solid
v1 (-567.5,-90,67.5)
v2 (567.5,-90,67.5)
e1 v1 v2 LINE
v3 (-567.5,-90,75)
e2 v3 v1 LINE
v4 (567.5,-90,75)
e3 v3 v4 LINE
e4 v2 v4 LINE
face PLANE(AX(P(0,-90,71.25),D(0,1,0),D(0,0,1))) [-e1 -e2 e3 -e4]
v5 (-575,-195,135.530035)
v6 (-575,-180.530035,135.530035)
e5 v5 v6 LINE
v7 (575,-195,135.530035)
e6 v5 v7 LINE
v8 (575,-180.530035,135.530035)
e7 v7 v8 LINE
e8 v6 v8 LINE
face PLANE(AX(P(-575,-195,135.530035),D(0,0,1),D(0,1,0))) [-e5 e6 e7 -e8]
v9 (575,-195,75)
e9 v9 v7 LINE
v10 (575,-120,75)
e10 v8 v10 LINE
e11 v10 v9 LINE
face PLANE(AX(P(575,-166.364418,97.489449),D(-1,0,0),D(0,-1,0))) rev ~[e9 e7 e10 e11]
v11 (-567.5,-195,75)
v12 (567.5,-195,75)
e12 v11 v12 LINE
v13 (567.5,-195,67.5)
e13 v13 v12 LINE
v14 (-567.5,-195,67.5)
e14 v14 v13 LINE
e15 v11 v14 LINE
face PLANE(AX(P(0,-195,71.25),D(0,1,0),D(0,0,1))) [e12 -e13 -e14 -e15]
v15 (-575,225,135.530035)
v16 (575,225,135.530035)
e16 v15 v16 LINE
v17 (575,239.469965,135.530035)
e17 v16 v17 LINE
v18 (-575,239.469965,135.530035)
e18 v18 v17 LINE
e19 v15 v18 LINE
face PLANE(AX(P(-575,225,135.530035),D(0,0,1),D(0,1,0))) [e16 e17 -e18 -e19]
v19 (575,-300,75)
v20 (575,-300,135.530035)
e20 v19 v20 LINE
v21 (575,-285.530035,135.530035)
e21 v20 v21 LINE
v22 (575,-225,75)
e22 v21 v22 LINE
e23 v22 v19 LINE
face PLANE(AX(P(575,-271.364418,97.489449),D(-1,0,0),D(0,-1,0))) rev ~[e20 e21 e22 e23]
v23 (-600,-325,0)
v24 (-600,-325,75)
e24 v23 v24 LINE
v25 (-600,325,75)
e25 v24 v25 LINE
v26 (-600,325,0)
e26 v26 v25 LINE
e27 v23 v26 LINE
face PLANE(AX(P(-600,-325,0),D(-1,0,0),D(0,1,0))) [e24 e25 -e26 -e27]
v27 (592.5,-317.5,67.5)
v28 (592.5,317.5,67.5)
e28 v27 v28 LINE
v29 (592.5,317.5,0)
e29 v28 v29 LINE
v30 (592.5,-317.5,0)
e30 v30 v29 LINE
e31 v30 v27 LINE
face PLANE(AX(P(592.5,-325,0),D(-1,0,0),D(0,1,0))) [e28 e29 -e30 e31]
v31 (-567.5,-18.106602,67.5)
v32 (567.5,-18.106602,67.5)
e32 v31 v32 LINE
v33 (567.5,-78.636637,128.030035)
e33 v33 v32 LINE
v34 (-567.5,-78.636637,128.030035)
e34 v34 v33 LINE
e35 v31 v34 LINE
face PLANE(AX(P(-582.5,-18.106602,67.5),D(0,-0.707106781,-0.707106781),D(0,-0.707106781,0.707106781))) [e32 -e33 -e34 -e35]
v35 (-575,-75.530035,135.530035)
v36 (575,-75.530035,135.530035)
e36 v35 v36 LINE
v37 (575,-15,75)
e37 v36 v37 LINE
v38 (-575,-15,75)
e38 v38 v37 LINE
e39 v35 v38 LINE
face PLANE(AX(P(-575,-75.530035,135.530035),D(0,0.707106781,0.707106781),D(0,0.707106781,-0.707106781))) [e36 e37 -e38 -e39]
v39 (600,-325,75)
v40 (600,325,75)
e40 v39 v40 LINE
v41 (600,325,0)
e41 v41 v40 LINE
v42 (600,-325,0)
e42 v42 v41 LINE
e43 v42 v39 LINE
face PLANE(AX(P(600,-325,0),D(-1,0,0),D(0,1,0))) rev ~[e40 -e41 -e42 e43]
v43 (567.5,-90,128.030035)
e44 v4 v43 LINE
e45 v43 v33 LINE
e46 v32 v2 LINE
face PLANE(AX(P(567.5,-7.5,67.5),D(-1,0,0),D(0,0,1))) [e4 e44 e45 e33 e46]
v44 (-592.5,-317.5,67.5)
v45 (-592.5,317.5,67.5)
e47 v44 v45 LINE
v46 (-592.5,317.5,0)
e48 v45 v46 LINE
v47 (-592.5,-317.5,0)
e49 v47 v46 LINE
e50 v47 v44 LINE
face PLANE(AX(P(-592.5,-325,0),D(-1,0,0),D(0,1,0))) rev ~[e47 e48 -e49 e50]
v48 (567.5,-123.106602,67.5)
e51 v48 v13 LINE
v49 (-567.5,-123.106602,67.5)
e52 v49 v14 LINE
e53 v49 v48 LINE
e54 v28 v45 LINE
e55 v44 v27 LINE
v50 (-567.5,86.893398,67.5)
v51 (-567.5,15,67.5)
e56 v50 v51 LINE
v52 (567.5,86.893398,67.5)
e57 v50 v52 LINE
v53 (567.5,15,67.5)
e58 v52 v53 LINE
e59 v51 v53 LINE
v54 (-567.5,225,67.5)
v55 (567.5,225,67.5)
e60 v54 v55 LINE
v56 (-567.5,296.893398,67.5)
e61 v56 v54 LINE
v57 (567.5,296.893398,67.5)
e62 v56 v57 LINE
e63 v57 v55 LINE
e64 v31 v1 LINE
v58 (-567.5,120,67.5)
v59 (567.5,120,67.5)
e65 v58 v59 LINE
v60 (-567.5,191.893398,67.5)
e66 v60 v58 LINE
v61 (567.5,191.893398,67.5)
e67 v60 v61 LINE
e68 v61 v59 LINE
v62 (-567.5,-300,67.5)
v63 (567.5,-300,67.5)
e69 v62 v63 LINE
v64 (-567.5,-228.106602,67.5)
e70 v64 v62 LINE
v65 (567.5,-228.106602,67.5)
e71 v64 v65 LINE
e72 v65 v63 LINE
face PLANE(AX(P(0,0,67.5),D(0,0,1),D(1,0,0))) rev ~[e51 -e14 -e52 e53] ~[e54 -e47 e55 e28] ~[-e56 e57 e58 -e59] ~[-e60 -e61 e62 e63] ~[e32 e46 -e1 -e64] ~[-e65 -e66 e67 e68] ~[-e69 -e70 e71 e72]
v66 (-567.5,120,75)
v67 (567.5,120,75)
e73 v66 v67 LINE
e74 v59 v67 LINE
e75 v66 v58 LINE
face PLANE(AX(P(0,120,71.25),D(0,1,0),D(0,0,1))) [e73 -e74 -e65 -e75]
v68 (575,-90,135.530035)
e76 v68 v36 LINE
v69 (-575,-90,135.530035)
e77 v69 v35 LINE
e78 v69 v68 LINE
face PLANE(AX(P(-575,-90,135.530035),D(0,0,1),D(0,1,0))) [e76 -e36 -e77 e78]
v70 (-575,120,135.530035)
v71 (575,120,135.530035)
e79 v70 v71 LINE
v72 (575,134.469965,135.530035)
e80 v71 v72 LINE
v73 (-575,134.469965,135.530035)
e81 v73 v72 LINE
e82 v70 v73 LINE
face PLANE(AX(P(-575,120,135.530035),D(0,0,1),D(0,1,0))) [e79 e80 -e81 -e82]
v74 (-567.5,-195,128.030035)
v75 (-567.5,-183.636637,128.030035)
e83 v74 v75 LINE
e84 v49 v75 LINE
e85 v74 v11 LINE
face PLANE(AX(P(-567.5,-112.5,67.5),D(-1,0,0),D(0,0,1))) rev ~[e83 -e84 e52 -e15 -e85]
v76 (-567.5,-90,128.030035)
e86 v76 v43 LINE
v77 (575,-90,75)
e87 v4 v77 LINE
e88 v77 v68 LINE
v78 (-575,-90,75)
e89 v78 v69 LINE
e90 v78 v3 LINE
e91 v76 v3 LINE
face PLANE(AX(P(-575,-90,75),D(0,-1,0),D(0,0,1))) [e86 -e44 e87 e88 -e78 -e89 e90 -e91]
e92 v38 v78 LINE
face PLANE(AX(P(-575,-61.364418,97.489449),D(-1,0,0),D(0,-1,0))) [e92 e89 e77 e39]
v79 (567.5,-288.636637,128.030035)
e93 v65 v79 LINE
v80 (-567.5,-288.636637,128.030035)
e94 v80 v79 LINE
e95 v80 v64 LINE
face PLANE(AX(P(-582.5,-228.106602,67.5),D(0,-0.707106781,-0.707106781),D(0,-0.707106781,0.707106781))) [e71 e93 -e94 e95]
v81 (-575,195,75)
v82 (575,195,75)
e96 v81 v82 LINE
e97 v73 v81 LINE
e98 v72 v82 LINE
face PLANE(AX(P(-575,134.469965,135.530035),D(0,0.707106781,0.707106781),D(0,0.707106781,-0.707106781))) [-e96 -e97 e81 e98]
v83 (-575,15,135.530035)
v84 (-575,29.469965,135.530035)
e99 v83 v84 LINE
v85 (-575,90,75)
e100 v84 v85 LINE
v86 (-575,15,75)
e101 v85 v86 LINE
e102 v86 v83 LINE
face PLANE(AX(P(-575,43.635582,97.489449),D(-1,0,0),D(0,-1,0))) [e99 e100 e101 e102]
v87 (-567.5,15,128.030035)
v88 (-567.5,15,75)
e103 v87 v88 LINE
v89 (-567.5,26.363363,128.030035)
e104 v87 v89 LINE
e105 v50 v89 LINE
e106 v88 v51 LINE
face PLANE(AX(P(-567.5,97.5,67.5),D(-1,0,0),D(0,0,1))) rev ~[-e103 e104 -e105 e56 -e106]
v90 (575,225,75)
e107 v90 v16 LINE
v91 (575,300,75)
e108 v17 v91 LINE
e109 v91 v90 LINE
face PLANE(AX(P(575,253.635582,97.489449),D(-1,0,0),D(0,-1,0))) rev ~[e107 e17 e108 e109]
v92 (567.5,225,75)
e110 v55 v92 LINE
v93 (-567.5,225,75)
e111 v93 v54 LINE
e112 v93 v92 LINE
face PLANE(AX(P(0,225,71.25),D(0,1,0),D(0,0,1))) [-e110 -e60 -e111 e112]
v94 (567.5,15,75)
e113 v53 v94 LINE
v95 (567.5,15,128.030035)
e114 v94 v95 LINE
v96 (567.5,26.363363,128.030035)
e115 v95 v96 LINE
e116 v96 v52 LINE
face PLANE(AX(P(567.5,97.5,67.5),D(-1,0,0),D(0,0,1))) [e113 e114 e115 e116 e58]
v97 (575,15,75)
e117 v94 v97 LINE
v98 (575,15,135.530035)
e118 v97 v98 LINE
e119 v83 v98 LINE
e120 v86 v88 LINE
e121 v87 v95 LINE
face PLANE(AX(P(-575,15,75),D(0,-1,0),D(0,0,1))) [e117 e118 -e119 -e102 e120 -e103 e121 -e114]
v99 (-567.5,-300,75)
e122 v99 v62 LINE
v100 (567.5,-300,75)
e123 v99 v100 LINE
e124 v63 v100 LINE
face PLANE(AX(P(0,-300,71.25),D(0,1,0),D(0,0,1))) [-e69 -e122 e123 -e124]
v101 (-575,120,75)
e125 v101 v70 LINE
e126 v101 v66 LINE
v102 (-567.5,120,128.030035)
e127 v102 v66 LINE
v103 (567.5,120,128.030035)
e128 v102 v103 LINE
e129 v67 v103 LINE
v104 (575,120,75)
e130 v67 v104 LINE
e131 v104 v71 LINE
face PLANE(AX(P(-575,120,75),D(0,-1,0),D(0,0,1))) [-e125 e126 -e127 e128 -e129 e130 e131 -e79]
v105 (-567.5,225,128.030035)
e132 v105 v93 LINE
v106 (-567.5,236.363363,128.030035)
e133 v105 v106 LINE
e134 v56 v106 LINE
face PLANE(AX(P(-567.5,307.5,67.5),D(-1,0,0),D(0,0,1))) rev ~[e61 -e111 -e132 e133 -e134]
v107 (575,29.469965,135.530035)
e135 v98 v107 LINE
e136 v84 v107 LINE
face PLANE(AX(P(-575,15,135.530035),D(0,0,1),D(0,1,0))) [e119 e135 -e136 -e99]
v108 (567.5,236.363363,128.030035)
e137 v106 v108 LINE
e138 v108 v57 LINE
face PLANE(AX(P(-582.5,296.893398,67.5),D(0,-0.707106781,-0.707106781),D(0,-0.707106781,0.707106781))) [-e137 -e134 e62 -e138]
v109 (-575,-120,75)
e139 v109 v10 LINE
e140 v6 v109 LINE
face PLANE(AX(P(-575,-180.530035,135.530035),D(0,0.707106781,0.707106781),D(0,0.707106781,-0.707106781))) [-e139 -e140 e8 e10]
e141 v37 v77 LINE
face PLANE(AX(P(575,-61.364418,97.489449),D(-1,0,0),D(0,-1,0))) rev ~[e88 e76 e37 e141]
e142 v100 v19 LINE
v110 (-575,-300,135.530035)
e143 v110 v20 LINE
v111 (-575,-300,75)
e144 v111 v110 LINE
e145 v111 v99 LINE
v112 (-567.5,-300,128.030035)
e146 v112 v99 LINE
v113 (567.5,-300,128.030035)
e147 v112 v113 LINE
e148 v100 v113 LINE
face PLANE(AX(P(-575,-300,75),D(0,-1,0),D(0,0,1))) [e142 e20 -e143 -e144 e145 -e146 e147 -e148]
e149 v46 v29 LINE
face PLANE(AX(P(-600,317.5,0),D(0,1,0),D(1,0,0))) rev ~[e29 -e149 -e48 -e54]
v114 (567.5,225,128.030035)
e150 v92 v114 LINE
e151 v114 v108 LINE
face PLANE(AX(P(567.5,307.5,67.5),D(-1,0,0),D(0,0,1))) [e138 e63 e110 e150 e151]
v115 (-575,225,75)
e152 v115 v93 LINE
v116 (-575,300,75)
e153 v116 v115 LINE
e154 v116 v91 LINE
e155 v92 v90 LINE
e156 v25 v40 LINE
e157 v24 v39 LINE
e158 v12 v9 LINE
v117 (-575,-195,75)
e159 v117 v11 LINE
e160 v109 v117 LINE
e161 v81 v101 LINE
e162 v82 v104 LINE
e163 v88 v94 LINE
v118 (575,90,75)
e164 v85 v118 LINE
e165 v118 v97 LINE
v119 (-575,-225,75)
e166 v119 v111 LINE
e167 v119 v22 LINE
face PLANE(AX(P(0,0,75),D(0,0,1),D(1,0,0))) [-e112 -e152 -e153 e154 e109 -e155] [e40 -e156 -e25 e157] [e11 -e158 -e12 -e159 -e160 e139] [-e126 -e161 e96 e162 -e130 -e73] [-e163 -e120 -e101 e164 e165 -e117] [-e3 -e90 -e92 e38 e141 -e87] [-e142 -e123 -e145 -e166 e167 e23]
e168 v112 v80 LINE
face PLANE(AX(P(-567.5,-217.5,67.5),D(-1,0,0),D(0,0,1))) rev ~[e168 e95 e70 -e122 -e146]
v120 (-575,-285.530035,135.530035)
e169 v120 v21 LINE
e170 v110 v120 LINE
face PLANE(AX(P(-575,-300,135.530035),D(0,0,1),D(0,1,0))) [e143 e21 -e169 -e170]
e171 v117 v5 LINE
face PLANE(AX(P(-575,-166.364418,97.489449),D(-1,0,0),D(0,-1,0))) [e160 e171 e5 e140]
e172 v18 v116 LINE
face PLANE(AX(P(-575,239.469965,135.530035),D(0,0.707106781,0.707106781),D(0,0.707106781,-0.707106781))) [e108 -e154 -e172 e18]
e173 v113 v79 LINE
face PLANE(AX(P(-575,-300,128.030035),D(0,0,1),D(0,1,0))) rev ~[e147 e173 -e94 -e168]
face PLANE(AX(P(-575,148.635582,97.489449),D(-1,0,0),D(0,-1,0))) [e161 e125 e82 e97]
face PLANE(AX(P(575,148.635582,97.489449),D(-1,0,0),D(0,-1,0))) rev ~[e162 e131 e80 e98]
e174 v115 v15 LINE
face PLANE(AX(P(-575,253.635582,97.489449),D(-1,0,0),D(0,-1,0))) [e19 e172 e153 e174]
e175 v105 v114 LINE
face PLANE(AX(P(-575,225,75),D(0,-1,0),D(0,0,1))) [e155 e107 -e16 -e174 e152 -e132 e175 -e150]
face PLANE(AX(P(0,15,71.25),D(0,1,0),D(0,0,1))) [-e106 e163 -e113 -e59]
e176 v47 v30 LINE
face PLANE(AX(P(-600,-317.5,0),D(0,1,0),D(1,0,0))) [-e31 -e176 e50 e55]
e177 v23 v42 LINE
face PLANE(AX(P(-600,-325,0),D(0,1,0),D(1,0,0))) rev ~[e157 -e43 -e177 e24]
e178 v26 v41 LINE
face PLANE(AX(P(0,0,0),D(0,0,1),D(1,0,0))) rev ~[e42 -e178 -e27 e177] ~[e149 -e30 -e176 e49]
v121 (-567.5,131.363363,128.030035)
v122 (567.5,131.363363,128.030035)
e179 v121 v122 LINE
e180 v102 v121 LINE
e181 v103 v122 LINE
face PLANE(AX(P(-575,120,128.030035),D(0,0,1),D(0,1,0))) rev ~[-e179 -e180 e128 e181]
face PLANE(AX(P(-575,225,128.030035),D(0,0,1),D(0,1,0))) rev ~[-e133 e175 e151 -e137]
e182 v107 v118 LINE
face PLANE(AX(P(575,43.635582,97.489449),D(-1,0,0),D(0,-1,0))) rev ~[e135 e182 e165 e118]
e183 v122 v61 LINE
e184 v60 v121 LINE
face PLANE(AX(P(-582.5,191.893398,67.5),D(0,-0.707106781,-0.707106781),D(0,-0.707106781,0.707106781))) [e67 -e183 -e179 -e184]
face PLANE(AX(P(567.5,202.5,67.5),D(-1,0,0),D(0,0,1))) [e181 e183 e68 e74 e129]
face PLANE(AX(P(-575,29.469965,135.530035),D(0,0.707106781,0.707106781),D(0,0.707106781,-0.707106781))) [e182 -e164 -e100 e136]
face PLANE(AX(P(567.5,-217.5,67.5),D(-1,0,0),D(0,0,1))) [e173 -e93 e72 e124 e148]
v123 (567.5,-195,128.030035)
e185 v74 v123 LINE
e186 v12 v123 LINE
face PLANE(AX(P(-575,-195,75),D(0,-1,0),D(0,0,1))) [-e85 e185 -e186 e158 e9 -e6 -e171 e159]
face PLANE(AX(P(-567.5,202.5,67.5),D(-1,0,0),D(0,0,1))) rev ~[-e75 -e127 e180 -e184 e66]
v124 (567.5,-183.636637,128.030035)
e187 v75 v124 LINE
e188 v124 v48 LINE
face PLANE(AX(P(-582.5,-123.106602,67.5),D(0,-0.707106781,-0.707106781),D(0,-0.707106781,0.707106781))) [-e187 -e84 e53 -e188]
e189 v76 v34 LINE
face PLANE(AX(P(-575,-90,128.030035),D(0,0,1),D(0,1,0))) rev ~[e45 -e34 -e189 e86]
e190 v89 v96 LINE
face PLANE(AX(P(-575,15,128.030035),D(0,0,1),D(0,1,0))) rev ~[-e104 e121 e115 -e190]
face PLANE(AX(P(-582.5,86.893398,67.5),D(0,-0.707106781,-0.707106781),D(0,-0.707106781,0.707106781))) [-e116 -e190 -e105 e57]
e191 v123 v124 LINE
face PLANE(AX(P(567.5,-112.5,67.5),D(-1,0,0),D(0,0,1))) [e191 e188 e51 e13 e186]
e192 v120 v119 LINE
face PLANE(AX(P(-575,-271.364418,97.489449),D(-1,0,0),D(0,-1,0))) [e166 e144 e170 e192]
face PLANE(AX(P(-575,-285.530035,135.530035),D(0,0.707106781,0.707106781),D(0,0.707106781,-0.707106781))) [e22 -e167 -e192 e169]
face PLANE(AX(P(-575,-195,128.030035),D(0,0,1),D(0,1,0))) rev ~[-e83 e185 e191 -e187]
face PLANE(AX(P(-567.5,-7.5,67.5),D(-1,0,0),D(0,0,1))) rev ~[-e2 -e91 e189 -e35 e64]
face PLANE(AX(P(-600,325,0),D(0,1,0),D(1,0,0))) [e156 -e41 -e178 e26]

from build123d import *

# Parameters (mm, degrees)
F0_W         = 1200
F0_H         = 650
F1_DEPTH     = 75
F3_START     = -25
F3_DEPTH     = 1150
F4_T         = 7.5
F4_T3_DEPTH  = 90
F4_T5_DEPTH  = 1165
F4_T7_DEPTH  = 90
F4_T9_DEPTH  = 90
F4_T11_DEPTH = 90
F4_T13_DEPTH = 90
F4_T15_DEPTH = 90


# Not quite as in the source:
# - a shell that OpenCascade refuses in one call is made with other operations: the cavity is built on its own and cut out
# - a feature names something its author has since deleted; it is built from what else it names


with BuildPart() as f1:
    # F0 (on Top) → F1 (new body)
    with BuildSketch(Plane.XY):
        Rectangle(F0_W, F0_H)
    extrude(amount=F1_DEPTH)

    # F2 (on face) → F3 (join)
    with BuildSketch(Plane(origin=(-600, 0, 0), x_dir=(0, -1, 0), z_dir=(-1, 0, 0)).offset(F3_START)):
        Polygon((-239.4699645042, 135.5300354958), (-300, 75), (-225, 75), (-225, 135.5300354958), align=None)
        Polygon((-134.4699645042, 135.5300354958), (-195, 75), (-120, 75), (-120, 135.5300354958), align=None)
        Polygon((-29.4699645042, 135.5300354958), (-90, 75), (-15, 75), (-15, 135.5300354958), align=None)
        Polygon((75.5300354958, 135.5300354958), (15, 75), (90, 75), (90, 135.5300354958), align=None)
        Polygon((120, 75), (195, 75), (195, 135.5300354958), (180.5300354958, 135.5300354958), align=None)
        Polygon((225, 75), (300, 75), (300, 135.5300354958), (285.5300354958, 135.5300354958), align=None)
    extrude(amount=-F3_DEPTH)

    # F4: shell of thickness 7.5, made by hand


with BuildPart() as f4_core1:
    # F4_t2: copy of F1
    add(f1.part)

    # the walls: a layer under each face that stays
    f4_faces = [f4_core1.faces().sort_by_distance(p)[0] for p in [
        (0, -325, 37.5),
        (-600, 0, 37.5),
        (600, 0, 37.5),
        (0, 0, 75),
        (0, 325, 37.5),
        (-575, -262.5, 105.2650177479),
        (575, -262.5, 105.2650177479),
        (0, -255.2650177479, 105.2650177479),
        (-575, -157.5, 105.2650177479),
        (575, -157.5, 105.2650177479),
        (0, -150.2650177479, 105.2650177479),
        (-575, -52.5, 105.2650177479),
        (575, -52.5, 105.2650177479),
        (0, -45.2650177479, 105.2650177479),
        (-575, 52.5, 105.2650177479),
        (575, 52.5, 105.2650177479),
        (0, 59.7349822521, 105.2650177479),
        (-575, 157.5, 105.2650177479),
        (575, 157.5, 105.2650177479),
        (0, 164.7349822521, 105.2650177479),
        (-575, 262.5, 105.2650177479),
        (575, 262.5, 105.2650177479),
        (0, 269.7349822521, 105.2650177479),
        (0, -292.7650177479, 135.5300354958),
        (0, -187.7650177479, 135.5300354958),
        (0, -82.7650177479, 135.5300354958),
        (0, 22.2349822521, 135.5300354958),
        (0, 127.2349822521, 135.5300354958),
        (0, 232.2349822521, 135.5300354958),
    ]]
    thicken(f4_faces, amount=-F4_T, mode=Mode.SUBTRACT)

    # F4_s4 → F4_t3 (cut)
    with BuildSketch(Plane.XZ.offset(217.5)):
        Polygon((-575.075, 75.075), (-575, 67.5), (-567.5, 67.5), (-567.5, 75), align=None)
        Polygon((575.075, 75.075), (575, 67.5), (567.5, 67.5), (567.5, 75), align=None)
    extrude(amount=F4_T3_DEPTH, mode=Mode.SUBTRACT)

    # F4_s6 → F4_t5 (cut)
    with BuildSketch(Plane.YZ.offset(-582.5)):
        Polygon((-224.9469669914, 75.1280330086), (-225, 67.5), (-228.1066017178, 67.5), (-230.3033008589, 69.6966991411), align=None)
        Polygon((-119.9469669914, 75.1280330086), (-120, 67.5), (-123.1066017178, 67.5), (-125.3033008589, 69.6966991411), align=None)
        Polygon((-14.9469669914, 75.1280330086), (-15, 67.5), (-18.1066017178, 67.5), (-20.3033008589, 69.6966991411), align=None)
        Polygon((90.0530330086, 75.1280330086), (90, 67.5), (86.8933982822, 67.5), (84.6966991411, 69.6966991411), align=None)
        Polygon((195.0530330086, 75.1280330086), (195, 67.5), (191.8933982822, 67.5), (189.6966991411, 69.6966991411), align=None)
        Polygon((300.0530330086, 75.1280330086), (300, 67.5), (296.8933982822, 67.5), (294.6966991411, 69.6966991411), align=None)
    extrude(amount=F4_T5_DEPTH, mode=Mode.SUBTRACT)

    # F4_s8 → F4_t7 (cut)
    with BuildSketch(Plane.XZ.offset(112.5)):
        Polygon((-575.075, 75.075), (-575, 67.5), (-567.5, 67.5), (-567.5, 75), align=None)
        Polygon((575.075, 75.075), (575, 67.5), (567.5, 67.5), (567.5, 75), align=None)
    extrude(amount=F4_T7_DEPTH, mode=Mode.SUBTRACT)

    # F4_s10 → F4_t9 (cut)
    with BuildSketch(Plane.XZ.offset(7.5)):
        Polygon((-575.075, 75.075), (-575, 67.5), (-567.5, 67.5), (-567.5, 75), align=None)
        Polygon((575.075, 75.075), (575, 67.5), (567.5, 67.5), (567.5, 75), align=None)
    extrude(amount=F4_T9_DEPTH, mode=Mode.SUBTRACT)

    # F4_s12 → F4_t11 (cut)
    with BuildSketch(Plane.XZ.offset(-97.5)):
        Polygon((-575.075, 75.075), (-575, 67.5), (-567.5, 67.5), (-567.5, 75), align=None)
        Polygon((575.075, 75.075), (575, 67.5), (567.5, 67.5), (567.5, 75), align=None)
    extrude(amount=F4_T11_DEPTH, mode=Mode.SUBTRACT)

    # F4_s14 → F4_t13 (cut)
    with BuildSketch(Plane.XZ.offset(-202.5)):
        Polygon((-575.075, 75.075), (-575, 67.5), (-567.5, 67.5), (-567.5, 75), align=None)
        Polygon((575.075, 75.075), (575, 67.5), (567.5, 67.5), (567.5, 75), align=None)
    extrude(amount=F4_T13_DEPTH, mode=Mode.SUBTRACT)

    # F4_s16 → F4_t15 (cut)
    with BuildSketch(Plane.XZ.offset(-307.5)):
        Polygon((-575.075, 75.075), (-575, 67.5), (-567.5, 67.5), (-567.5, 75), align=None)
        Polygon((575.075, 75.075), (575, 67.5), (567.5, 67.5), (567.5, 75), align=None)
    extrude(amount=F4_T15_DEPTH, mode=Mode.SUBTRACT)


with BuildPart() as f1_1:
    add(f1.part)

    # what is left inside the walls is the cavity
    f4_cavity = [f4_core1.part.solids().sort_by_distance(p)[0] for p in [
        (0, -105.833333, 0.075),
    ]]
    add(f4_cavity, mode=Mode.SUBTRACT)


solid = f1_1.part
